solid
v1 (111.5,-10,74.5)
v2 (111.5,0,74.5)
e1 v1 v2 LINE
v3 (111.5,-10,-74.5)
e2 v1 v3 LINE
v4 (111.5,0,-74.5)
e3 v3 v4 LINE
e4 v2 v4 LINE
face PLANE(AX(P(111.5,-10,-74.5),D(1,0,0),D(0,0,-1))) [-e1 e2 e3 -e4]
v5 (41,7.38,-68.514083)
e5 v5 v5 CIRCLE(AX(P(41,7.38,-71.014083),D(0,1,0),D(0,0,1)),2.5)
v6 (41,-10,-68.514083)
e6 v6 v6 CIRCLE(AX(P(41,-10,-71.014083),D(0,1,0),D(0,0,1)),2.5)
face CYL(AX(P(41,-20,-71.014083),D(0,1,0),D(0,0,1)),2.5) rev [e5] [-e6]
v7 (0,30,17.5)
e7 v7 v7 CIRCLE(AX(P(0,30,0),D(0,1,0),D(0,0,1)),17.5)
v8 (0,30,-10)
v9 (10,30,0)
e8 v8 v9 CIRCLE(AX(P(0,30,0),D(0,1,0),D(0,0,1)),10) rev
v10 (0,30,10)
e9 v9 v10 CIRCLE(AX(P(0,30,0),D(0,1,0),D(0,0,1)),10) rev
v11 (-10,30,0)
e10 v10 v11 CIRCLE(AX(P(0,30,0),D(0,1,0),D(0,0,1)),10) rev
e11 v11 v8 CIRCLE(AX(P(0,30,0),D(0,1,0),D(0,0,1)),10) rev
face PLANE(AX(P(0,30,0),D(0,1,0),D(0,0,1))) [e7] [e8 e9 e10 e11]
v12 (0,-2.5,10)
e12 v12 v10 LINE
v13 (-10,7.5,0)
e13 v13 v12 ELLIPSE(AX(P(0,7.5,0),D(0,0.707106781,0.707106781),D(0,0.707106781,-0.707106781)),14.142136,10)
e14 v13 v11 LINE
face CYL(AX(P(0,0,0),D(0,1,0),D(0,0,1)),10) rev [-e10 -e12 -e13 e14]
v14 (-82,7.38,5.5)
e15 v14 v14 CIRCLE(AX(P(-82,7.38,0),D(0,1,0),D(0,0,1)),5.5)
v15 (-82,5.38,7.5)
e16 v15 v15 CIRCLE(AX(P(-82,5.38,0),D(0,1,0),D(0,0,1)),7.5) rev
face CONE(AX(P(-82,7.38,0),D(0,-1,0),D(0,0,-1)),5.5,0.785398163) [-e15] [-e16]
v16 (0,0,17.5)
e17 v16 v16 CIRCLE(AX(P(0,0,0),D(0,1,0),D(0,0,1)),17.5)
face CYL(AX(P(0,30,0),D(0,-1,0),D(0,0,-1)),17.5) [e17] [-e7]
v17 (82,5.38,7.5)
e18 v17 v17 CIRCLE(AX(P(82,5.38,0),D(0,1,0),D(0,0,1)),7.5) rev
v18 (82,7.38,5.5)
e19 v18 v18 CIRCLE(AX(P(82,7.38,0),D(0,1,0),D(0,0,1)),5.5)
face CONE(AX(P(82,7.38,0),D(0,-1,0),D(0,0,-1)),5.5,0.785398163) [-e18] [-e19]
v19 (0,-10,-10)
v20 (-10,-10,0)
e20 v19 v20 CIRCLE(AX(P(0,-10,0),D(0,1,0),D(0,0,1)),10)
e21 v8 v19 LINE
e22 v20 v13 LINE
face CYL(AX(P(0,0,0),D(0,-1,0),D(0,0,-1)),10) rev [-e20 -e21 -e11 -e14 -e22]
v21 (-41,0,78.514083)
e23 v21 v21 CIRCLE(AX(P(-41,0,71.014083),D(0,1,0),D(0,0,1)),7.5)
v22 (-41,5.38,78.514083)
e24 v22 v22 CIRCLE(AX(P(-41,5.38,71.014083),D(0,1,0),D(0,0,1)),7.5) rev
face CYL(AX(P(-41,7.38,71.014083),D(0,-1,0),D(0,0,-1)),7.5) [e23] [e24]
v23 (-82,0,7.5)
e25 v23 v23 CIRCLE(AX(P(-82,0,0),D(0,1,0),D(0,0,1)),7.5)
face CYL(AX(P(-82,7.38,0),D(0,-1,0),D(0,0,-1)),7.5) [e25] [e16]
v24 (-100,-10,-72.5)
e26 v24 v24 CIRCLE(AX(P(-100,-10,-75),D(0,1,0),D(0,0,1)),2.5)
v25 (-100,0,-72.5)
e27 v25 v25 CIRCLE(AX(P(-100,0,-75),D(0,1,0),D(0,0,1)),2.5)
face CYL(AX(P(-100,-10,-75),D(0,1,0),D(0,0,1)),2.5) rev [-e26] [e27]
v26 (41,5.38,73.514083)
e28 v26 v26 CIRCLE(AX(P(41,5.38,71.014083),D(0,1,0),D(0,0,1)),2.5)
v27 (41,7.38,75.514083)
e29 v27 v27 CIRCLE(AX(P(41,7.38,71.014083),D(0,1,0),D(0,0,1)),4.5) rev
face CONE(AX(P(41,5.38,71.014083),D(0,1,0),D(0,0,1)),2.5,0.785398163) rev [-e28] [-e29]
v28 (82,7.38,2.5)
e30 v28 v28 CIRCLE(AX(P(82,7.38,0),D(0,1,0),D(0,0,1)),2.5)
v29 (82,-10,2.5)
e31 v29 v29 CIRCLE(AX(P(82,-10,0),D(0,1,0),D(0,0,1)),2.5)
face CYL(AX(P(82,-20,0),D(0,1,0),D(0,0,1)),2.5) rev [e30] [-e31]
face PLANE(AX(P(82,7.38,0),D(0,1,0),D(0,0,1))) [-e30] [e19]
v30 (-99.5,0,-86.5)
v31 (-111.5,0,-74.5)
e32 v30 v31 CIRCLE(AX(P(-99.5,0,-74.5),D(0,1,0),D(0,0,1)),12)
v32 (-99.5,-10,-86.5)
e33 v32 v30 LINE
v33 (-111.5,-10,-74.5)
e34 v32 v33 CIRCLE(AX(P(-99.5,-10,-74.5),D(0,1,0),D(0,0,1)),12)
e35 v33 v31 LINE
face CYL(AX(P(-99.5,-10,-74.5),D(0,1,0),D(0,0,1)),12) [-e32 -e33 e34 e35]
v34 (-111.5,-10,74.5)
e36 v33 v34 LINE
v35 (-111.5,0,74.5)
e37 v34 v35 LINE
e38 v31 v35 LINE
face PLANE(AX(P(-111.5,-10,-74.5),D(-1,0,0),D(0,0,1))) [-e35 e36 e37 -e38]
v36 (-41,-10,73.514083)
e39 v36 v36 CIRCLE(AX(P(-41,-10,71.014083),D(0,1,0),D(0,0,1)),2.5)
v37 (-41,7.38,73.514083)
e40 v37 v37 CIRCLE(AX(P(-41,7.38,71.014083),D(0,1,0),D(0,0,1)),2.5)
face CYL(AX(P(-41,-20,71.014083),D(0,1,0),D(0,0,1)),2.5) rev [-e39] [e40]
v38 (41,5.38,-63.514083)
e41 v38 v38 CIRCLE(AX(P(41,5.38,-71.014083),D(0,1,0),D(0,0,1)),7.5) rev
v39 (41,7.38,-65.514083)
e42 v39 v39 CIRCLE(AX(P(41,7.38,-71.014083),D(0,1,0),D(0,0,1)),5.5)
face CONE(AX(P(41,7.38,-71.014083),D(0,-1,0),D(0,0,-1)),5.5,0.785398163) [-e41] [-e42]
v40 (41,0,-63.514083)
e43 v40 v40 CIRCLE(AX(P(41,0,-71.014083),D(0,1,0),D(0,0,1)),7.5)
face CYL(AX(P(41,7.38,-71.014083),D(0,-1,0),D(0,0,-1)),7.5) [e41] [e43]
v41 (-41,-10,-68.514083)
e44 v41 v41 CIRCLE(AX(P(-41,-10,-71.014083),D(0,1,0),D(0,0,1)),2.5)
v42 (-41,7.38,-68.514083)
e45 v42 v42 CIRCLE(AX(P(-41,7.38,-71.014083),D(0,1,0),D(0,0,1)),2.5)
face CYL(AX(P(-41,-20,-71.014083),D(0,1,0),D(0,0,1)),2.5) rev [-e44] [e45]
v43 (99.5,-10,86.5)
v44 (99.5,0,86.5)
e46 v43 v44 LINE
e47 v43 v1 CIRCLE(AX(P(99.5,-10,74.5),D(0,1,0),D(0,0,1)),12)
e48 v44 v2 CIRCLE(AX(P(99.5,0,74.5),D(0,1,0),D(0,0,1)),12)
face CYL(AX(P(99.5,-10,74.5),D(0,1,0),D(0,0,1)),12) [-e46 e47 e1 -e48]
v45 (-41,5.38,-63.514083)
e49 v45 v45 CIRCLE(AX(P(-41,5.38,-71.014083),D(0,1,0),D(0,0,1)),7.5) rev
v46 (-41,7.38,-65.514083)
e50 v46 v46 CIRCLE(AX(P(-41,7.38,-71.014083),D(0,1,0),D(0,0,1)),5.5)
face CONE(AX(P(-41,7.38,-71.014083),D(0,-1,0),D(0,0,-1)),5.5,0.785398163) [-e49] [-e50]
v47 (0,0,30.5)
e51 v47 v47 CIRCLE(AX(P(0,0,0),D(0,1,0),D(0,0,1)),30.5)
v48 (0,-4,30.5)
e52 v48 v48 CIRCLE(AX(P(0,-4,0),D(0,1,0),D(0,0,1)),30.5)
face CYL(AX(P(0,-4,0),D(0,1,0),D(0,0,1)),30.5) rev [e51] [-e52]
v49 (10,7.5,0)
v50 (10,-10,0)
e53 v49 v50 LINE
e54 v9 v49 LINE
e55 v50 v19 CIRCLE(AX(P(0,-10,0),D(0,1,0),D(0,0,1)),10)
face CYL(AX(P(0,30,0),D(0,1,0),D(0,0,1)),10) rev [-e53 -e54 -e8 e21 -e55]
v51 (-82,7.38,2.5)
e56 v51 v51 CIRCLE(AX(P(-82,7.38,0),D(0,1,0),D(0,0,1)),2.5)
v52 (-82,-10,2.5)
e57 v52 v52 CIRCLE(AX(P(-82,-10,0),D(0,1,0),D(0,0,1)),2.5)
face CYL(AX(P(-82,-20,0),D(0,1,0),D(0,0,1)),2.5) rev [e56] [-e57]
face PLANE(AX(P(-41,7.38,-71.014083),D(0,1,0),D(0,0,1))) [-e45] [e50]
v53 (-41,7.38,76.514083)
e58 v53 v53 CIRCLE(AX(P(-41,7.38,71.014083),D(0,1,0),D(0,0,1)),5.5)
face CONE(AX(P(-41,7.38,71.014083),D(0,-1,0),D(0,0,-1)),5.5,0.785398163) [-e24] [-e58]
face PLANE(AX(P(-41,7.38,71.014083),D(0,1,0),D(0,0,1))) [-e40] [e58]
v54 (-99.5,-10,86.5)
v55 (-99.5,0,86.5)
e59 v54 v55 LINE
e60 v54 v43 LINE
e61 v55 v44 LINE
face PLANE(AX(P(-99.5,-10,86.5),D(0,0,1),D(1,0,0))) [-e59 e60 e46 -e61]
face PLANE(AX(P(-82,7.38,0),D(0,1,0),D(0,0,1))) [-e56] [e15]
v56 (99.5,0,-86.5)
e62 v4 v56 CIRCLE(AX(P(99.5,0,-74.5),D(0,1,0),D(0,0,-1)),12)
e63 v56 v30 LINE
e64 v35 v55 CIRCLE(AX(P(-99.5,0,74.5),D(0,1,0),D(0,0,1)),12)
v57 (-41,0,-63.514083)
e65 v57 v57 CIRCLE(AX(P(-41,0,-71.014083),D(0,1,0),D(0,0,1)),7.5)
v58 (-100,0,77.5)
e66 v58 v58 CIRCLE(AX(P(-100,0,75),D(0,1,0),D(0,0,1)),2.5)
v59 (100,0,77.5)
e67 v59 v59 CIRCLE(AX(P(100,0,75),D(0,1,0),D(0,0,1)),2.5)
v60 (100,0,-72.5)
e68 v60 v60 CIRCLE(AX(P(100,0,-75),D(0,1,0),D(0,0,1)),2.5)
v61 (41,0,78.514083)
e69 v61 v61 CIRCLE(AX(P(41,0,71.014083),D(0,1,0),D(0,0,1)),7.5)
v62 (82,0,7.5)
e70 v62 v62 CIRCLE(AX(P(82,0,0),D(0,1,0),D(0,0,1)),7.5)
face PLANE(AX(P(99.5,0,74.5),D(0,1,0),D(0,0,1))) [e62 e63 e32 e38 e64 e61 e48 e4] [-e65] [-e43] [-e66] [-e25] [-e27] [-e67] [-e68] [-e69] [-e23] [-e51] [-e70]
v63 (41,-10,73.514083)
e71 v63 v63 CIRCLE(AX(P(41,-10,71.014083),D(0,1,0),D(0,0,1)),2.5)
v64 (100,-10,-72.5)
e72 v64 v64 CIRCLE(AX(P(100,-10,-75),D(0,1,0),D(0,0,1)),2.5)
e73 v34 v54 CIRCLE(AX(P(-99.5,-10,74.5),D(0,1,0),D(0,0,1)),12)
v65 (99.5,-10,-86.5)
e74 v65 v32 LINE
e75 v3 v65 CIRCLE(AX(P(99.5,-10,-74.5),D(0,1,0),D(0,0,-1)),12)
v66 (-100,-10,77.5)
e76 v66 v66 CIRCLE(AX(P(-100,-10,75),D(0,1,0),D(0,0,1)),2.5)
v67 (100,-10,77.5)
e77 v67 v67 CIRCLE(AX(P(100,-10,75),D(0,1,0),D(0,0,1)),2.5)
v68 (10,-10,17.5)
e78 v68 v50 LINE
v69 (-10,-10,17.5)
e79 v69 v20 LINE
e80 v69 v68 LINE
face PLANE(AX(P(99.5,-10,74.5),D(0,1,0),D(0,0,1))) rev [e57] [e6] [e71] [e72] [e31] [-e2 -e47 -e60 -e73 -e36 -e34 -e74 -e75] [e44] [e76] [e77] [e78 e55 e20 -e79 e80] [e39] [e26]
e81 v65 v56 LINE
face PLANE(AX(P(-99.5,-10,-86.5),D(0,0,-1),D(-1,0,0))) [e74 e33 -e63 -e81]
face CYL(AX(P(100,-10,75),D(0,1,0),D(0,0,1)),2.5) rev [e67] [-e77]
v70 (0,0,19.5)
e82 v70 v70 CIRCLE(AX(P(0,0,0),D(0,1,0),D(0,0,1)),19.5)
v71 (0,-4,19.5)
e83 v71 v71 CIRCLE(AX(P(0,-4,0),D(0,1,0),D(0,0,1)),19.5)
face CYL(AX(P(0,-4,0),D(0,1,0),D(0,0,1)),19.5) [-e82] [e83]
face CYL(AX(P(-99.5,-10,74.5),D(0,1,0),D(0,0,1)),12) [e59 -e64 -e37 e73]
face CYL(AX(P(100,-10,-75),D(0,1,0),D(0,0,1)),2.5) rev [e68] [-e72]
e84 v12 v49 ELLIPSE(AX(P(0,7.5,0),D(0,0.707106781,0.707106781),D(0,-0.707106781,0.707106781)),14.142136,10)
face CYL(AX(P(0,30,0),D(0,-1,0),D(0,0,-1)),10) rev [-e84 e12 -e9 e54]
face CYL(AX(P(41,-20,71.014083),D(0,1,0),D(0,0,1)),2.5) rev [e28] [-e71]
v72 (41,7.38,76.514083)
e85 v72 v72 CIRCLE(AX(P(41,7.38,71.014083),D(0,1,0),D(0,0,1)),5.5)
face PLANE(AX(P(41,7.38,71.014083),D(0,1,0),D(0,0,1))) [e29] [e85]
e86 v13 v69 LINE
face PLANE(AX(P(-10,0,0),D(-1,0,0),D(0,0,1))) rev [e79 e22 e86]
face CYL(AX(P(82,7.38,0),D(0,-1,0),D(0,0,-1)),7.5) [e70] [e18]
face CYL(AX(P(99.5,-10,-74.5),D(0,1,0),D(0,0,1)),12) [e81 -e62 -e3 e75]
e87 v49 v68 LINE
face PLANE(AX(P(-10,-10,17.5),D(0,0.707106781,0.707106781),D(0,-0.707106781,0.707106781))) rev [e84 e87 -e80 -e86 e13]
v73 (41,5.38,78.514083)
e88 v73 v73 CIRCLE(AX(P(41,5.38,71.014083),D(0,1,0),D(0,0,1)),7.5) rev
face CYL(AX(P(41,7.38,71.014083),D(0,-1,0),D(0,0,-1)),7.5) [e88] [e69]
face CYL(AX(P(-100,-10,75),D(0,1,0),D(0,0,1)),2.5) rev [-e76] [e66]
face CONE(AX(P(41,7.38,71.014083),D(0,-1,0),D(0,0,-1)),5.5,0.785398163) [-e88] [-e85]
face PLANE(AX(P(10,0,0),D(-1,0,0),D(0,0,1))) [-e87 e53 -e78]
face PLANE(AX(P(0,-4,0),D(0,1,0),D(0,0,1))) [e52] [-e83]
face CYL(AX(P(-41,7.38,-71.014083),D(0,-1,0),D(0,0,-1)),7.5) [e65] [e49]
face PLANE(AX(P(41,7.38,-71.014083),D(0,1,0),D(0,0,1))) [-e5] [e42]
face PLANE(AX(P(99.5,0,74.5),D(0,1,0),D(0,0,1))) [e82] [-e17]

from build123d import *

# Parameters (mm, degrees)
SKETCH1_R           = 2.5
BOSS_EXTRUDE1_DEPTH = 10
SKETCH2_R           = 30.5
SKETCH2_R_2         = 19.5
CUT_EXTRUDE1_DEPTH  = 4
SKETCH3_R           = 17.5
BOSS_EXTRUDE2_DEPTH = 30
CUT_EXTRUDE2_DEPTH  = 10
FILLET1_R           = 10
SKETCH9_R           = 2.5
CUT_EXTRUDE4_DEPTH  = 20
BOSS_EXTRUDE3_START = 7.38
SKETCH10_R          = 7.5
SKETCH10_R_2        = 2.5
BOSS_EXTRUDE3_DEPTH = 7.38
CHAMFER1_SIZE       = 2


with BuildPart() as part:
    # Sketch1 → Boss-Extrude1 (new body)
    with BuildSketch(Plane(origin=(0, 0, 0), x_dir=(1, 0, 0), z_dir=(0, 1, 0))):
        with BuildLine():
            Line((-99.5, 86.5), (99.5, 86.5))
            ThreePointArc((99.5, 86.5), (107.985281374, 82.985281374), (111.5, 74.5))
            Line((111.5, 74.5), (111.5, -74.5))
            ThreePointArc((111.5, -74.5), (107.985281374, -82.985281374), (99.5, -86.5))
            Line((99.5, -86.5), (-99.5, -86.5))
            ThreePointArc((-99.5, -86.5), (-107.985281374, -82.985281374), (-111.5, -74.5))
            Line((-111.5, -74.5), (-111.5, 74.5))
            ThreePointArc((-111.5, 74.5), (-107.985281374, 82.985281374), (-99.5, 86.5))
        make_face()
        with Locations(Location((100, 75, 0), (0, 0, 270))):
            Circle(SKETCH1_R, mode=Mode.SUBTRACT)
        with Locations(Location((100, -75, 0), (0, 0, 270))):
            Circle(SKETCH1_R, mode=Mode.SUBTRACT)
        with Locations(Location((-100, -75, 0), (0, 0, 270))):
            Circle(SKETCH1_R, mode=Mode.SUBTRACT)
        with Locations(Location((-100, 75, 0), (0, 0, 270))):
            Circle(SKETCH1_R, mode=Mode.SUBTRACT)
    extrude(amount=-BOSS_EXTRUDE1_DEPTH)

    # Sketch2 → Cut-Extrude1 (cut)
    with BuildSketch(Plane(origin=(0, 0, 0), x_dir=(1, 0, 0), z_dir=(0, 1, 0))):
        with Locations(Location((0, 0, 0), (0, 0, 270))):
            Circle(SKETCH2_R)
        with Locations(Location((0, 0, 0), (0, 0, 270))):
            Circle(SKETCH2_R_2, mode=Mode.SUBTRACT)
    extrude(amount=-CUT_EXTRUDE1_DEPTH, mode=Mode.SUBTRACT)

    # Sketch3 → Boss-Extrude2 (add)
    with BuildSketch(Plane(origin=(0, 0, 0), x_dir=(1, 0, 0), z_dir=(0, 1, 0))):
        with Locations(Location((0, 0, 0), (0, 0, 270))):
            Circle(SKETCH3_R)
    extrude(amount=BOSS_EXTRUDE2_DEPTH)

    # Sketch6 → Cut-Extrude2 (cut, symmetric)
    with BuildSketch(Plane(origin=(0, 0, 0), x_dir=(0, 0, -1), z_dir=(1, 0, 0))):
        Polygon((-10, 30), (10, 30), (10, -10), (-10, -10), (-17.5, -10), (-10, -2.5), align=None)
    extrude(amount=CUT_EXTRUDE2_DEPTH, both=True, mode=Mode.SUBTRACT)

    # Fillet1
    fillet1_edges = [part.edges().sort_by_distance(p)[0] for p in [
        (10, 13.75, 10),
        (-10, 13.75, 10),
        (-10, 10, -10),
        (10, 10, -10),
    ]]
    fillet(fillet1_edges, radius=FILLET1_R - 0.0001)  # a hair under: the kernel refuses the full size

    # Sketch9 → Cut-Extrude4 (cut)
    with BuildSketch(Plane(origin=(0, 0, 0), x_dir=(1, 0, 0), z_dir=(0, 1, 0))):
        with Locations(Location((41, 71.01408311, 0), (0, 0, 270))):
            Circle(SKETCH9_R)
        with Locations(Location((82, 0, 0), (0, 0, 270))):
            Circle(SKETCH9_R)
        with Locations(Location((41, -71.01408311, 0), (0, 0, 270))):
            Circle(SKETCH9_R)
        with Locations(Location((-41, -71.01408311, 0), (0, 0, 270))):
            Circle(SKETCH9_R)
        with Locations(Location((-82, 0, 0), (0, 0, 270))):
            Circle(SKETCH9_R)
        with Locations(Location((-41, 71.01408311, 0), (0, 0, 270))):
            Circle(SKETCH9_R)
    extrude(amount=-CUT_EXTRUDE4_DEPTH, mode=Mode.SUBTRACT)

    # Sketch10 → Boss-Extrude3 (add)
    # profile 1 of 6: a face of its own
    with BuildSketch(Plane(origin=(0, 0, 0), x_dir=(1, 0, 0), z_dir=(0, 1, 0)).offset(BOSS_EXTRUDE3_START)):
        with Locations(Location((41, 71.01408311, 0), (0, 0, 270))):
            Circle(SKETCH10_R)
        with Locations(Location((41, 71.01408311, 0), (0, 0, 270))):
            Circle(SKETCH10_R_2, mode=Mode.SUBTRACT)
    # profile 2 of 6: a face of its own
    with BuildSketch(Plane(origin=(0, 0, 0), x_dir=(1, 0, 0), z_dir=(0, 1, 0)).offset(BOSS_EXTRUDE3_START)):
        with Locations(Location((82, 0, 0), (0, 0, 270))):
            Circle(SKETCH10_R)
        with Locations(Location((82, 0, 0), (0, 0, 270))):
            Circle(SKETCH10_R_2, mode=Mode.SUBTRACT)
    # profile 3 of 6: a face of its own
    with BuildSketch(Plane(origin=(0, 0, 0), x_dir=(1, 0, 0), z_dir=(0, 1, 0)).offset(BOSS_EXTRUDE3_START)):
        with Locations(Location((41, -71.01408311, 0), (0, 0, 270))):
            Circle(SKETCH10_R)
        with Locations(Location((41, -71.01408311, 0), (0, 0, 270))):
            Circle(SKETCH10_R_2, mode=Mode.SUBTRACT)
    # profile 4 of 6: a face of its own
    with BuildSketch(Plane(origin=(0, 0, 0), x_dir=(1, 0, 0), z_dir=(0, 1, 0)).offset(BOSS_EXTRUDE3_START)):
        with Locations(Location((-41, -71.01408311, 0), (0, 0, 270))):
            Circle(SKETCH10_R)
        with Locations(Location((-41, -71.01408311, 0), (0, 0, 270))):
            Circle(SKETCH10_R_2, mode=Mode.SUBTRACT)
    # profile 5 of 6: a face of its own
    with BuildSketch(Plane(origin=(0, 0, 0), x_dir=(1, 0, 0), z_dir=(0, 1, 0)).offset(BOSS_EXTRUDE3_START)):
        with Locations(Location((-82, 0, 0), (0, 0, 270))):
            Circle(SKETCH10_R)
        with Locations(Location((-82, 0, 0), (0, 0, 270))):
            Circle(SKETCH10_R_2, mode=Mode.SUBTRACT)
    # profile 6 of 6: a face of its own
    with BuildSketch(Plane(origin=(0, 0, 0), x_dir=(1, 0, 0), z_dir=(0, 1, 0)).offset(BOSS_EXTRUDE3_START)):
        with Locations(Location((-41, 71.01408311, 0), (0, 0, 270))):
            Circle(SKETCH10_R)
        with Locations(Location((-41, 71.01408311, 0), (0, 0, 270))):
            Circle(SKETCH10_R_2, mode=Mode.SUBTRACT)
    extrude(amount=-BOSS_EXTRUDE3_DEPTH)

    # Chamfer1
    chamfer1_edges = [part.edges().sort_by_distance(p)[0] for p in [
        (41, 7.38, -78.51408311),
        (82, 7.38, -7.5),
        (41, 7.38, 63.51408311),
        (41, 7.38, 68.51408311),
        (-41, 7.38, 63.51408311),
        (-82, 7.38, -7.5),
        (-41, 7.38, -78.51408311),
    ]]
    chamfer(chamfer1_edges, length=CHAMFER1_SIZE)


solid = part.part
